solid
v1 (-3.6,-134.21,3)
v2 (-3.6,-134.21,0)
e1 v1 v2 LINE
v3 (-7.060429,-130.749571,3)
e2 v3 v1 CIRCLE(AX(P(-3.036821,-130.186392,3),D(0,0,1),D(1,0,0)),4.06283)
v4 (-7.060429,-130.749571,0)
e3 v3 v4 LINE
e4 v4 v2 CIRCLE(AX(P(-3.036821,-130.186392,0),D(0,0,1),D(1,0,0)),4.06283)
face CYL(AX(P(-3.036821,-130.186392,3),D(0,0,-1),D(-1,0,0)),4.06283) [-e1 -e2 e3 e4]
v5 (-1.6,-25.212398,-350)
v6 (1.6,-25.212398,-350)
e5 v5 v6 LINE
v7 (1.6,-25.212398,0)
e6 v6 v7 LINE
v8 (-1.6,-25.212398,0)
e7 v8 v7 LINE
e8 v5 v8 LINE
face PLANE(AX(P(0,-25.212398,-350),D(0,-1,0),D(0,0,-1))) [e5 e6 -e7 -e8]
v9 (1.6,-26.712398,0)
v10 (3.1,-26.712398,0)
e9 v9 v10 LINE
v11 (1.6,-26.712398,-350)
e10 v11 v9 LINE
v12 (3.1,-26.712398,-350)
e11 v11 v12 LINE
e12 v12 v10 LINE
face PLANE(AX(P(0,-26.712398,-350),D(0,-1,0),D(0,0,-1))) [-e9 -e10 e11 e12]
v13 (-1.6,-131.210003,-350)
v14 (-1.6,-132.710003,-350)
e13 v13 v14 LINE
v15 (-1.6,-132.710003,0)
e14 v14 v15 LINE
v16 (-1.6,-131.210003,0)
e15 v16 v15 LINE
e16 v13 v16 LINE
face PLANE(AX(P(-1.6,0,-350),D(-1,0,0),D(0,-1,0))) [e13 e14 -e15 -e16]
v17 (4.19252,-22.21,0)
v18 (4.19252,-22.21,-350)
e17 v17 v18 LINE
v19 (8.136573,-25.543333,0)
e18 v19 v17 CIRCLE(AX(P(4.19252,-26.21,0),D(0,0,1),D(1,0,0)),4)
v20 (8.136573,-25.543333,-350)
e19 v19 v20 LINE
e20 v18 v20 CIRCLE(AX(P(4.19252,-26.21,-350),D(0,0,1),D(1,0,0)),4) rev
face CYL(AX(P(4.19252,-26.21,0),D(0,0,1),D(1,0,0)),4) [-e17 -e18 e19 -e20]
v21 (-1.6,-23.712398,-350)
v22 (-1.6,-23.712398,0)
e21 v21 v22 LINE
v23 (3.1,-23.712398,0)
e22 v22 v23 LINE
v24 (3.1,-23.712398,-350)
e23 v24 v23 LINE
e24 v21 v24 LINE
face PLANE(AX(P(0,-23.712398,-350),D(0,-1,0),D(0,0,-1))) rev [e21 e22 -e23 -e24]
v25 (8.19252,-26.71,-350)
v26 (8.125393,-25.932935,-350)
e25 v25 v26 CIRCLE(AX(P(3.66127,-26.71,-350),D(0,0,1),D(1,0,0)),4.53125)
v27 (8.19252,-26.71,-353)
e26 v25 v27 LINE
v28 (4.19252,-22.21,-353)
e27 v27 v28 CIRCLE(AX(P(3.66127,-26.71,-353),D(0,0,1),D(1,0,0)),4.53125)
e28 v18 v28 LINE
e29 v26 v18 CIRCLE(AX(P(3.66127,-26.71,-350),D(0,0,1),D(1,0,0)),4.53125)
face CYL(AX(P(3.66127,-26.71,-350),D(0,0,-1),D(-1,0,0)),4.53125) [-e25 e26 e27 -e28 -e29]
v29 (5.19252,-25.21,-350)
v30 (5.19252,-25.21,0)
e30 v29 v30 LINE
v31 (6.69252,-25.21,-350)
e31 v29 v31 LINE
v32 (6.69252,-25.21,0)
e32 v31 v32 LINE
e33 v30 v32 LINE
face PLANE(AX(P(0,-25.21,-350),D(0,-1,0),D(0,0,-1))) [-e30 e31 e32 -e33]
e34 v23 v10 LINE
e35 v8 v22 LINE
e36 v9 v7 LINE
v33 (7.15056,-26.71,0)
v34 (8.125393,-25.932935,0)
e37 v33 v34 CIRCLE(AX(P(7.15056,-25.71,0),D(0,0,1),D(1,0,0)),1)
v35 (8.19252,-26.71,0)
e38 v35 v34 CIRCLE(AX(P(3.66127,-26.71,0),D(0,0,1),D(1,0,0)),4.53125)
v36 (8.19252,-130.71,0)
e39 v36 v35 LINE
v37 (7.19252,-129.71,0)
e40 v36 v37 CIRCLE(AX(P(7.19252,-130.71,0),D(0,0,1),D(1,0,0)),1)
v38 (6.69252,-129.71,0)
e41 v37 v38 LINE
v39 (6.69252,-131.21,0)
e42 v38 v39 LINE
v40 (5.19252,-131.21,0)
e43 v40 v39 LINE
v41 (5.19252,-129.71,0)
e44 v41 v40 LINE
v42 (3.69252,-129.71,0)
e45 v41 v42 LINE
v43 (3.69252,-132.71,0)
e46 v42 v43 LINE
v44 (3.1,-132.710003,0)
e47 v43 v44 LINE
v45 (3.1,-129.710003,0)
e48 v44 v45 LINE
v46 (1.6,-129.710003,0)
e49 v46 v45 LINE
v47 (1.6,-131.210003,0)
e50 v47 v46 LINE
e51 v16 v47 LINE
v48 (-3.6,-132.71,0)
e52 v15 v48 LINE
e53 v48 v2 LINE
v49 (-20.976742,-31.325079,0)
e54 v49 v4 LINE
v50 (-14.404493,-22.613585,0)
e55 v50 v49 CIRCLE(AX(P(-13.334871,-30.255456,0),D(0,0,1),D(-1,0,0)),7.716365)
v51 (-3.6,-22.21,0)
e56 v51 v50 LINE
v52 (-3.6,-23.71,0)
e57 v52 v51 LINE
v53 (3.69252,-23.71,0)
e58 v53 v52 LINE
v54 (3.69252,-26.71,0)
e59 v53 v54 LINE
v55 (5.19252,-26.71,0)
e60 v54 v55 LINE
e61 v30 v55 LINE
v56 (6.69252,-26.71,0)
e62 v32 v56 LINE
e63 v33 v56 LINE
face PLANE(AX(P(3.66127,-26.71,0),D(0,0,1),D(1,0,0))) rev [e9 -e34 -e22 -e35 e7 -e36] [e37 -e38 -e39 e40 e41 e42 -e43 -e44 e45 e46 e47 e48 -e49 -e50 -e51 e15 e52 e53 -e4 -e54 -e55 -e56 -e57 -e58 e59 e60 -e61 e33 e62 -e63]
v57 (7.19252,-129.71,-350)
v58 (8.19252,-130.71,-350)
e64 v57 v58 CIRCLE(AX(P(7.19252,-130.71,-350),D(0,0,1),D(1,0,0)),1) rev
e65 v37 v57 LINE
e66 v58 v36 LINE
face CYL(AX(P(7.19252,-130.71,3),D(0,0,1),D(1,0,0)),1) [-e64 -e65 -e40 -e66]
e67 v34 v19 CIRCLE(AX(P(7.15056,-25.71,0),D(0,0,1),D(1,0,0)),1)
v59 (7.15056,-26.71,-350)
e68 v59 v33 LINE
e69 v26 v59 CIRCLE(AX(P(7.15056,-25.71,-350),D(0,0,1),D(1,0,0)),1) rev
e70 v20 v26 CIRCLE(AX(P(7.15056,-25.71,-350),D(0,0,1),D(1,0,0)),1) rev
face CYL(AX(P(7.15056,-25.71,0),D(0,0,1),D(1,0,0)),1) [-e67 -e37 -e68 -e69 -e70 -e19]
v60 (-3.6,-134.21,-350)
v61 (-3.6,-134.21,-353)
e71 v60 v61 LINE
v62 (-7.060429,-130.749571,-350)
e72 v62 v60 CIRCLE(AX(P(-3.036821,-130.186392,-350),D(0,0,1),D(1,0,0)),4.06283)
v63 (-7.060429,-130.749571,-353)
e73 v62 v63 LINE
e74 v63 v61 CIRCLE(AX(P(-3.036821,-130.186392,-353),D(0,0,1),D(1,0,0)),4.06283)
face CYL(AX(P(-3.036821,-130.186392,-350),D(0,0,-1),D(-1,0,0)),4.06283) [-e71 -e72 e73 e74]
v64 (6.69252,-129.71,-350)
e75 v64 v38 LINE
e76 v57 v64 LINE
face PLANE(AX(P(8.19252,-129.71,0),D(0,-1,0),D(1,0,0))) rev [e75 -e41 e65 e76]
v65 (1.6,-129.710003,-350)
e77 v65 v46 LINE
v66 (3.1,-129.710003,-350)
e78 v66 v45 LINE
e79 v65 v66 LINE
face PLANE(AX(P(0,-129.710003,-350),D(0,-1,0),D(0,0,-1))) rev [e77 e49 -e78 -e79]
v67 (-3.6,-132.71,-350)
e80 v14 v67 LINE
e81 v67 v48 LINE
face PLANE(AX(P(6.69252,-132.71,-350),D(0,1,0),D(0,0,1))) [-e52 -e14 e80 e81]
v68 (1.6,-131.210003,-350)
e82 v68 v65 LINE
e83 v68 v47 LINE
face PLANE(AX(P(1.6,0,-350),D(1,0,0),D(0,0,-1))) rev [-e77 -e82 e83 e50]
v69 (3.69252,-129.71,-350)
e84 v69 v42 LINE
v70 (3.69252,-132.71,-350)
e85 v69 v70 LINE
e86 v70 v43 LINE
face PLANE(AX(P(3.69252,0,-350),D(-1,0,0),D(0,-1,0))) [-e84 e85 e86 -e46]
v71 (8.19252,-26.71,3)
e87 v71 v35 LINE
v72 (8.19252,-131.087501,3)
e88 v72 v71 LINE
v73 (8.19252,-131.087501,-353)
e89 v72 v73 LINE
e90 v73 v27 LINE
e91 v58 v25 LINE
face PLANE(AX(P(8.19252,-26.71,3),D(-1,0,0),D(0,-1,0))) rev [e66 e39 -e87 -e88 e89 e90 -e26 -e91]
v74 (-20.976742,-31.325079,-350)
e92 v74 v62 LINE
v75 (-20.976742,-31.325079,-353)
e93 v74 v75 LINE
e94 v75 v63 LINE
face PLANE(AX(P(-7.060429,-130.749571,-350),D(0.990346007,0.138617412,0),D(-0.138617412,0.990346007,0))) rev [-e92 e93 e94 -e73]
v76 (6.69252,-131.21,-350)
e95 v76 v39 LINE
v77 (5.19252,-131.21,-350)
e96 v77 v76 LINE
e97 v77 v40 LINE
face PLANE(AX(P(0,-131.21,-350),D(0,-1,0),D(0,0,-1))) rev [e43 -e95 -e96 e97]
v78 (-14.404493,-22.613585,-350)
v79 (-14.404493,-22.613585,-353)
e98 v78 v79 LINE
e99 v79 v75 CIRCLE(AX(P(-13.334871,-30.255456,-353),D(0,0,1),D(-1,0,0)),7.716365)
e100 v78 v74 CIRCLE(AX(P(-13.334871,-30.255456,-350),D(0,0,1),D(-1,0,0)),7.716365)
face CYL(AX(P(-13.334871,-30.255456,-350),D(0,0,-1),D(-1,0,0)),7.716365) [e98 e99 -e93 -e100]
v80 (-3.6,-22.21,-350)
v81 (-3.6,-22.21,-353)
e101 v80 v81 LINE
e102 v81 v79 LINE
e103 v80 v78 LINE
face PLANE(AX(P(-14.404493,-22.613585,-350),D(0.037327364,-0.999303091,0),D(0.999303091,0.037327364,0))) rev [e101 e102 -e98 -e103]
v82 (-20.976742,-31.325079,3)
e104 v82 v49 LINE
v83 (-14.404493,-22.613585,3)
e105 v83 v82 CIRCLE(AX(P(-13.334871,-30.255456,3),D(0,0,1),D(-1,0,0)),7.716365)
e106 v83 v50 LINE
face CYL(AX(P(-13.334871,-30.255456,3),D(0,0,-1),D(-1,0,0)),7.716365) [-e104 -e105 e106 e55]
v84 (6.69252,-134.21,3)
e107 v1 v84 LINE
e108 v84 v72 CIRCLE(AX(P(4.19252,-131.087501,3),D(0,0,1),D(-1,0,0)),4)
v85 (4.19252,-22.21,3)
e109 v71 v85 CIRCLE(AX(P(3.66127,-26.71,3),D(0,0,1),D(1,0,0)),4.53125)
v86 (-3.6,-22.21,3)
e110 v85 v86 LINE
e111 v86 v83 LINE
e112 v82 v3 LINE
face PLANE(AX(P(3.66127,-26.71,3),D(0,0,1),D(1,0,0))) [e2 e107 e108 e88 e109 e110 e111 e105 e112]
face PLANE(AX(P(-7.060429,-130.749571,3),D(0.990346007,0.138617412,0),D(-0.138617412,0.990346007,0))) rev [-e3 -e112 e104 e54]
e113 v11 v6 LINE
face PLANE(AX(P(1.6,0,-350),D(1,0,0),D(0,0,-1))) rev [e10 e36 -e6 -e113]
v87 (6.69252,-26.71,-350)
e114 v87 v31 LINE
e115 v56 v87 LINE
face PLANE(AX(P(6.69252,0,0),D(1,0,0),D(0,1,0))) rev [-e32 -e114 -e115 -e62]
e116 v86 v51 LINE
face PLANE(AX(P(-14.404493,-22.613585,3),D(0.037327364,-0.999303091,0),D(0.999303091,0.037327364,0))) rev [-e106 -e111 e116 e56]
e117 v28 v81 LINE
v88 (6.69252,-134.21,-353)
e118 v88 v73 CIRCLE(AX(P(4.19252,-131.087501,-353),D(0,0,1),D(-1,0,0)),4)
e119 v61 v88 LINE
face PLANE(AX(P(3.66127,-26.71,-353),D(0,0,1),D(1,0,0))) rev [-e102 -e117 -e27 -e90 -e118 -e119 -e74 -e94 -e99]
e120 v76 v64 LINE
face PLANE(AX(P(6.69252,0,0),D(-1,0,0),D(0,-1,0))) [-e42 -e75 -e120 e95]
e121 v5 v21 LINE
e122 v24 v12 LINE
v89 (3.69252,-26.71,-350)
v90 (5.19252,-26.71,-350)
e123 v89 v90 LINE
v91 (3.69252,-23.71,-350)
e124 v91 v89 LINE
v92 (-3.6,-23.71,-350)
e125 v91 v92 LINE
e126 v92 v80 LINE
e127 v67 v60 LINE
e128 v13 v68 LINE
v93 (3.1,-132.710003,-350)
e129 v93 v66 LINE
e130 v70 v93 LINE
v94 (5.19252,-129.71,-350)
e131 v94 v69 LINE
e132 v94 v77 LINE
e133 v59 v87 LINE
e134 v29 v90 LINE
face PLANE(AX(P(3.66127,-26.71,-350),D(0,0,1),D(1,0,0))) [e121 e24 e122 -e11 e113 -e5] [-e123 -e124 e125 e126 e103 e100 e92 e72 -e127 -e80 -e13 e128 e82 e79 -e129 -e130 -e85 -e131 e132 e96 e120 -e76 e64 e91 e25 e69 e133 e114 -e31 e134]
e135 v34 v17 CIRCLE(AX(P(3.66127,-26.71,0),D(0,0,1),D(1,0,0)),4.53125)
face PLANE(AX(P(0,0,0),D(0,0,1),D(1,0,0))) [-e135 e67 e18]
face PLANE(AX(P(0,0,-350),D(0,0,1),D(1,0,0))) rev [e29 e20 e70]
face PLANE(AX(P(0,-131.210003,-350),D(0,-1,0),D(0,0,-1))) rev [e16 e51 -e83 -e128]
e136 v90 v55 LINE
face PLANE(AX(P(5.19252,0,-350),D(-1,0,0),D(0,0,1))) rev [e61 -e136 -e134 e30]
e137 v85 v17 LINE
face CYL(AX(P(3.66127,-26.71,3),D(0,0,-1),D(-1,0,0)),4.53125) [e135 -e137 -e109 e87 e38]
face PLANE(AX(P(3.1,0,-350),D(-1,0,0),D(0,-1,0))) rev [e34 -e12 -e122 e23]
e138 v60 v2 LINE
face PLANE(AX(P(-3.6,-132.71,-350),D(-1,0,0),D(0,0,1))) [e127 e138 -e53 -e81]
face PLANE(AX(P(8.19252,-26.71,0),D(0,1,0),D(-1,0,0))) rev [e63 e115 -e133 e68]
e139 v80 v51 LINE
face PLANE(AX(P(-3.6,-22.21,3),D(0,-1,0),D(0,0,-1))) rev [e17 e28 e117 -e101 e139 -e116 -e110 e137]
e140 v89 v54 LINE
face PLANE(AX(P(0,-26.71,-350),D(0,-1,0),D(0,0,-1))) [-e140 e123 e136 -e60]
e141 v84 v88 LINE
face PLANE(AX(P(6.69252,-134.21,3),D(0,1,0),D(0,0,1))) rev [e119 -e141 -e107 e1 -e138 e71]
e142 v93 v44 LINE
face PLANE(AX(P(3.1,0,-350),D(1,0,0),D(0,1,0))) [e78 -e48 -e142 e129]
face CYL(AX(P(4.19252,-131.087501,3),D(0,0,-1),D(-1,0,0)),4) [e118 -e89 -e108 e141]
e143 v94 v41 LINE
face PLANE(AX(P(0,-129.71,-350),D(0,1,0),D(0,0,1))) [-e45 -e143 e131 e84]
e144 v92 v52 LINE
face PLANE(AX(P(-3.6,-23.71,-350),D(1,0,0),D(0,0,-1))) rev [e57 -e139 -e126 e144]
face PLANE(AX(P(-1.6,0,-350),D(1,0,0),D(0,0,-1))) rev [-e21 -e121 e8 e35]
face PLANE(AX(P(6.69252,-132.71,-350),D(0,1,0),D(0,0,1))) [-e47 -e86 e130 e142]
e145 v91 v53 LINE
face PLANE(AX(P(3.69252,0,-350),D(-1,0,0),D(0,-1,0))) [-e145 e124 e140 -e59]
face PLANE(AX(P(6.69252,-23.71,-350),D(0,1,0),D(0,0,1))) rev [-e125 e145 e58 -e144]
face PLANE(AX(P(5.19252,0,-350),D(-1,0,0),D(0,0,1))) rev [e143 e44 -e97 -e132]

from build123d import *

# Parameters (mm, degrees)
RAIL_W                    = 3.2
RAIL_H                    = 1.5
RAIL_W_2                  = 1.5
RAIL_H_2                  = 3
RAIL_W_3                  = 10.292519685
BOSS_EXTRUDE1_DEPTH       = 350
BOSS_EXTRUDE2_OUTLINE_W   = 350
BOSS_EXTRUDE2_OUTLINE_H   = 4.5
BOSS_EXTRUDE2_DEPTH       = 1.5
BOSS_EXTRUDE2_2_OUTLINE_W = 350
BOSS_EXTRUDE2_2_OUTLINE_H = 4.5
BOSS_EXTRUDE2_2_DEPTH     = 1.5
FILLET1_R                 = 4
FILLET2_R                 = 4
BOSS_EXTRUDE3_DEPTH       = 3
FILLET3_R                 = 1
FILLET4_R                 = 1
LPATTERN1_COUNT           = 2
LPATTERN1_PITCH           = 353


# Read off the part's stored shape, not the designer's step: Boss-Extrude2
with BuildPart() as part:
    # rail → Boss-Extrude1 (new body)
    with BuildSketch(Plane.XY):
        with Locations((0, -24.462398)):
            Rectangle(RAIL_W, RAIL_H)
        Polygon((1.6, -23.712398), (1.6, -25.212398), (1.6, -26.712398), (3.1, -26.712398), (3.1, -23.712398), align=None)
        with Locations((4.442519685, -25.21)):
            Rectangle(RAIL_W_2, RAIL_H_2)
        with Locations((5.942519685, -24.46)):
            Rectangle(RAIL_W_2, RAIL_H)
        with Locations((5.942519685, -131.96)):
            Rectangle(RAIL_W_2, RAIL_H)
        with Locations((4.442519685, -131.21)):
            Rectangle(RAIL_W_2, RAIL_H_2)
        Polygon((1.6, -129.710002609), (1.6, -131.210002609), (1.6, -132.710002609), (3.1, -132.710002609), (3.1, -129.710002609), align=None)
        with Locations((0, -131.960002609)):
            Rectangle(RAIL_W, RAIL_H)
        with Locations((1.546259843, -22.96)):
            Rectangle(RAIL_W_3, RAIL_H)
        with Locations((1.546259843, -133.46)):
            Rectangle(RAIL_W_3, RAIL_H)
    extrude(amount=-BOSS_EXTRUDE1_DEPTH)

    # Boss-Extrude2 outline → Boss-Extrude2 (add)
    with BuildSketch(Plane(origin=(6.692519685, 0, 0), x_dir=(0, 0, -1), z_dir=(1, 0, 0))):
        with Locations((175, -24.46)):
            Rectangle(BOSS_EXTRUDE2_OUTLINE_W, BOSS_EXTRUDE2_OUTLINE_H)
    extrude(amount=BOSS_EXTRUDE2_DEPTH)

    # Fillet1
    fillet1_edges = [part.edges().sort_by_distance(p)[0] for p in [
        (8.192519685, -22.21, -175),
    ]]
    fillet(fillet1_edges, radius=FILLET1_R)



with BuildPart() as body_2:
    # Boss-Extrude2 2 outline → Boss-Extrude2 2 (new body)
    with BuildSketch(Plane(origin=(6.692519685, 0, 0), x_dir=(0, 0, -1), z_dir=(1, 0, 0))):
        with Locations((175, -131.96)):
            Rectangle(BOSS_EXTRUDE2_2_OUTLINE_W, BOSS_EXTRUDE2_2_OUTLINE_H)
    extrude(amount=BOSS_EXTRUDE2_2_DEPTH)

    # Fillet2
    # the kernel refuses this fillet: 4 mm, written as the material it takes off along each edge
    with BuildSketch(Plane(origin=(8.192519685, -134.21, 7.806247498), x_dir=(-1, 0, 0), z_dir=(0, 0, -1))) as fillet2_piece_1:
        with BuildLine():
            CenterArc((4, 3.122498999), FILLET2_R, 180, 51.317812547)
            Line((0, 3.122498999), (-0.08, 3.122498999))
            Line((-0.08, 3.122498999), (-0.08, 0))
            Line((-0.08, 0), (0, -0.08))
            ThreePointArc((0, -0.08), (0.75, -0.08), (1.45, -0.06244998))
            Line((1.45, -0.06244998), (1.5, 0))
        make_face()
    extrude(amount=365.612494996, mode=Mode.SUBTRACT)


with BuildPart() as part_1:
    add(part.part)

    add(body_2.part)  # Boss-Extrude3 merges body 2
    # side → Boss-Extrude3 (add)
    with BuildSketch(Plane.XY):
        with BuildLine():
            Line((8.192519685, -26.71), (8.192519685, -129.71))
            Line((8.192519685, -129.71), (8.192519685, -131.087501001))
            ThreePointArc((8.192519685, -131.087501001), (7.798070961, -132.819551808), (6.692519685, -134.21))
            Line((6.692519685, -134.21), (-3.6, -134.21))
            ThreePointArc((-3.6, -134.21), (-5.909675728, -133.059247145), (-7.060428583, -130.749571417))
            Line((-7.060428583, -130.749571417), (-14.282896215, -79.148969011))
            Line((-14.282896215, -79.148969011), (-20.976742465, -31.325078818))
            ThreePointArc((-20.976742465, -31.325078818), (-19.494827467, -25.608174313), (-14.404493379, -22.613584515))
            Line((-14.404493379, -22.613584515), (-3.6, -22.21))
            Line((-3.6, -22.21), (4.192519685, -22.21))
            ThreePointArc((4.192519685, -22.21), (7.04796816, -23.699601355), (8.192519685, -26.71))
        make_face()
    boss_extrude3 = extrude(amount=BOSS_EXTRUDE3_DEPTH)

    # Fillet3
    fillet3_edges = [part_1.edges().sort_by_distance(p)[0] for p in [
        (8.192519685, -129.71, -175),
    ]]
    fillet(fillet3_edges, radius=FILLET3_R)

    # Fillet4
    # the kernel refuses this fillet: 1 mm, written as the material it takes off along each edge
    with BuildSketch(Plane(origin=(8.192519685, -26.71, 0), x_dir=(-0.047899365984683646, 0.9988521666083853, 0), z_dir=(0, 0, -1))) as fillet4_piece_1:
        with BuildLine():
            CenterArc((1.048761395, -0.992864746), FILLET4_R, 83.151413818, 99.594068227)
            Line((0.049909229, -1.040764112), (-0.049975988, -1.045554048))
            Line((-0.049975988, -1.045554048), (-0.099885217, -0.004789937))
            Line((-0.099885217, -0.004789937), (-0.004789937, 0.099885217))
            ThreePointArc((-0.004789937, 0.099885217), (0.494636147, 0.1238349), (1.179931939, 0.099286475))
            Line((1.179931939, 0.099286475), (1.168007344, 0))
        make_face()
    extrude(amount=352.920018361, mode=Mode.SUBTRACT)

    # LPattern1: Boss-Extrude3 ×2
    with Locations(*[(0, 0, -i * LPATTERN1_PITCH) for i in range(1, LPATTERN1_COUNT)]):
        add(boss_extrude3)


solid = part_1.part
